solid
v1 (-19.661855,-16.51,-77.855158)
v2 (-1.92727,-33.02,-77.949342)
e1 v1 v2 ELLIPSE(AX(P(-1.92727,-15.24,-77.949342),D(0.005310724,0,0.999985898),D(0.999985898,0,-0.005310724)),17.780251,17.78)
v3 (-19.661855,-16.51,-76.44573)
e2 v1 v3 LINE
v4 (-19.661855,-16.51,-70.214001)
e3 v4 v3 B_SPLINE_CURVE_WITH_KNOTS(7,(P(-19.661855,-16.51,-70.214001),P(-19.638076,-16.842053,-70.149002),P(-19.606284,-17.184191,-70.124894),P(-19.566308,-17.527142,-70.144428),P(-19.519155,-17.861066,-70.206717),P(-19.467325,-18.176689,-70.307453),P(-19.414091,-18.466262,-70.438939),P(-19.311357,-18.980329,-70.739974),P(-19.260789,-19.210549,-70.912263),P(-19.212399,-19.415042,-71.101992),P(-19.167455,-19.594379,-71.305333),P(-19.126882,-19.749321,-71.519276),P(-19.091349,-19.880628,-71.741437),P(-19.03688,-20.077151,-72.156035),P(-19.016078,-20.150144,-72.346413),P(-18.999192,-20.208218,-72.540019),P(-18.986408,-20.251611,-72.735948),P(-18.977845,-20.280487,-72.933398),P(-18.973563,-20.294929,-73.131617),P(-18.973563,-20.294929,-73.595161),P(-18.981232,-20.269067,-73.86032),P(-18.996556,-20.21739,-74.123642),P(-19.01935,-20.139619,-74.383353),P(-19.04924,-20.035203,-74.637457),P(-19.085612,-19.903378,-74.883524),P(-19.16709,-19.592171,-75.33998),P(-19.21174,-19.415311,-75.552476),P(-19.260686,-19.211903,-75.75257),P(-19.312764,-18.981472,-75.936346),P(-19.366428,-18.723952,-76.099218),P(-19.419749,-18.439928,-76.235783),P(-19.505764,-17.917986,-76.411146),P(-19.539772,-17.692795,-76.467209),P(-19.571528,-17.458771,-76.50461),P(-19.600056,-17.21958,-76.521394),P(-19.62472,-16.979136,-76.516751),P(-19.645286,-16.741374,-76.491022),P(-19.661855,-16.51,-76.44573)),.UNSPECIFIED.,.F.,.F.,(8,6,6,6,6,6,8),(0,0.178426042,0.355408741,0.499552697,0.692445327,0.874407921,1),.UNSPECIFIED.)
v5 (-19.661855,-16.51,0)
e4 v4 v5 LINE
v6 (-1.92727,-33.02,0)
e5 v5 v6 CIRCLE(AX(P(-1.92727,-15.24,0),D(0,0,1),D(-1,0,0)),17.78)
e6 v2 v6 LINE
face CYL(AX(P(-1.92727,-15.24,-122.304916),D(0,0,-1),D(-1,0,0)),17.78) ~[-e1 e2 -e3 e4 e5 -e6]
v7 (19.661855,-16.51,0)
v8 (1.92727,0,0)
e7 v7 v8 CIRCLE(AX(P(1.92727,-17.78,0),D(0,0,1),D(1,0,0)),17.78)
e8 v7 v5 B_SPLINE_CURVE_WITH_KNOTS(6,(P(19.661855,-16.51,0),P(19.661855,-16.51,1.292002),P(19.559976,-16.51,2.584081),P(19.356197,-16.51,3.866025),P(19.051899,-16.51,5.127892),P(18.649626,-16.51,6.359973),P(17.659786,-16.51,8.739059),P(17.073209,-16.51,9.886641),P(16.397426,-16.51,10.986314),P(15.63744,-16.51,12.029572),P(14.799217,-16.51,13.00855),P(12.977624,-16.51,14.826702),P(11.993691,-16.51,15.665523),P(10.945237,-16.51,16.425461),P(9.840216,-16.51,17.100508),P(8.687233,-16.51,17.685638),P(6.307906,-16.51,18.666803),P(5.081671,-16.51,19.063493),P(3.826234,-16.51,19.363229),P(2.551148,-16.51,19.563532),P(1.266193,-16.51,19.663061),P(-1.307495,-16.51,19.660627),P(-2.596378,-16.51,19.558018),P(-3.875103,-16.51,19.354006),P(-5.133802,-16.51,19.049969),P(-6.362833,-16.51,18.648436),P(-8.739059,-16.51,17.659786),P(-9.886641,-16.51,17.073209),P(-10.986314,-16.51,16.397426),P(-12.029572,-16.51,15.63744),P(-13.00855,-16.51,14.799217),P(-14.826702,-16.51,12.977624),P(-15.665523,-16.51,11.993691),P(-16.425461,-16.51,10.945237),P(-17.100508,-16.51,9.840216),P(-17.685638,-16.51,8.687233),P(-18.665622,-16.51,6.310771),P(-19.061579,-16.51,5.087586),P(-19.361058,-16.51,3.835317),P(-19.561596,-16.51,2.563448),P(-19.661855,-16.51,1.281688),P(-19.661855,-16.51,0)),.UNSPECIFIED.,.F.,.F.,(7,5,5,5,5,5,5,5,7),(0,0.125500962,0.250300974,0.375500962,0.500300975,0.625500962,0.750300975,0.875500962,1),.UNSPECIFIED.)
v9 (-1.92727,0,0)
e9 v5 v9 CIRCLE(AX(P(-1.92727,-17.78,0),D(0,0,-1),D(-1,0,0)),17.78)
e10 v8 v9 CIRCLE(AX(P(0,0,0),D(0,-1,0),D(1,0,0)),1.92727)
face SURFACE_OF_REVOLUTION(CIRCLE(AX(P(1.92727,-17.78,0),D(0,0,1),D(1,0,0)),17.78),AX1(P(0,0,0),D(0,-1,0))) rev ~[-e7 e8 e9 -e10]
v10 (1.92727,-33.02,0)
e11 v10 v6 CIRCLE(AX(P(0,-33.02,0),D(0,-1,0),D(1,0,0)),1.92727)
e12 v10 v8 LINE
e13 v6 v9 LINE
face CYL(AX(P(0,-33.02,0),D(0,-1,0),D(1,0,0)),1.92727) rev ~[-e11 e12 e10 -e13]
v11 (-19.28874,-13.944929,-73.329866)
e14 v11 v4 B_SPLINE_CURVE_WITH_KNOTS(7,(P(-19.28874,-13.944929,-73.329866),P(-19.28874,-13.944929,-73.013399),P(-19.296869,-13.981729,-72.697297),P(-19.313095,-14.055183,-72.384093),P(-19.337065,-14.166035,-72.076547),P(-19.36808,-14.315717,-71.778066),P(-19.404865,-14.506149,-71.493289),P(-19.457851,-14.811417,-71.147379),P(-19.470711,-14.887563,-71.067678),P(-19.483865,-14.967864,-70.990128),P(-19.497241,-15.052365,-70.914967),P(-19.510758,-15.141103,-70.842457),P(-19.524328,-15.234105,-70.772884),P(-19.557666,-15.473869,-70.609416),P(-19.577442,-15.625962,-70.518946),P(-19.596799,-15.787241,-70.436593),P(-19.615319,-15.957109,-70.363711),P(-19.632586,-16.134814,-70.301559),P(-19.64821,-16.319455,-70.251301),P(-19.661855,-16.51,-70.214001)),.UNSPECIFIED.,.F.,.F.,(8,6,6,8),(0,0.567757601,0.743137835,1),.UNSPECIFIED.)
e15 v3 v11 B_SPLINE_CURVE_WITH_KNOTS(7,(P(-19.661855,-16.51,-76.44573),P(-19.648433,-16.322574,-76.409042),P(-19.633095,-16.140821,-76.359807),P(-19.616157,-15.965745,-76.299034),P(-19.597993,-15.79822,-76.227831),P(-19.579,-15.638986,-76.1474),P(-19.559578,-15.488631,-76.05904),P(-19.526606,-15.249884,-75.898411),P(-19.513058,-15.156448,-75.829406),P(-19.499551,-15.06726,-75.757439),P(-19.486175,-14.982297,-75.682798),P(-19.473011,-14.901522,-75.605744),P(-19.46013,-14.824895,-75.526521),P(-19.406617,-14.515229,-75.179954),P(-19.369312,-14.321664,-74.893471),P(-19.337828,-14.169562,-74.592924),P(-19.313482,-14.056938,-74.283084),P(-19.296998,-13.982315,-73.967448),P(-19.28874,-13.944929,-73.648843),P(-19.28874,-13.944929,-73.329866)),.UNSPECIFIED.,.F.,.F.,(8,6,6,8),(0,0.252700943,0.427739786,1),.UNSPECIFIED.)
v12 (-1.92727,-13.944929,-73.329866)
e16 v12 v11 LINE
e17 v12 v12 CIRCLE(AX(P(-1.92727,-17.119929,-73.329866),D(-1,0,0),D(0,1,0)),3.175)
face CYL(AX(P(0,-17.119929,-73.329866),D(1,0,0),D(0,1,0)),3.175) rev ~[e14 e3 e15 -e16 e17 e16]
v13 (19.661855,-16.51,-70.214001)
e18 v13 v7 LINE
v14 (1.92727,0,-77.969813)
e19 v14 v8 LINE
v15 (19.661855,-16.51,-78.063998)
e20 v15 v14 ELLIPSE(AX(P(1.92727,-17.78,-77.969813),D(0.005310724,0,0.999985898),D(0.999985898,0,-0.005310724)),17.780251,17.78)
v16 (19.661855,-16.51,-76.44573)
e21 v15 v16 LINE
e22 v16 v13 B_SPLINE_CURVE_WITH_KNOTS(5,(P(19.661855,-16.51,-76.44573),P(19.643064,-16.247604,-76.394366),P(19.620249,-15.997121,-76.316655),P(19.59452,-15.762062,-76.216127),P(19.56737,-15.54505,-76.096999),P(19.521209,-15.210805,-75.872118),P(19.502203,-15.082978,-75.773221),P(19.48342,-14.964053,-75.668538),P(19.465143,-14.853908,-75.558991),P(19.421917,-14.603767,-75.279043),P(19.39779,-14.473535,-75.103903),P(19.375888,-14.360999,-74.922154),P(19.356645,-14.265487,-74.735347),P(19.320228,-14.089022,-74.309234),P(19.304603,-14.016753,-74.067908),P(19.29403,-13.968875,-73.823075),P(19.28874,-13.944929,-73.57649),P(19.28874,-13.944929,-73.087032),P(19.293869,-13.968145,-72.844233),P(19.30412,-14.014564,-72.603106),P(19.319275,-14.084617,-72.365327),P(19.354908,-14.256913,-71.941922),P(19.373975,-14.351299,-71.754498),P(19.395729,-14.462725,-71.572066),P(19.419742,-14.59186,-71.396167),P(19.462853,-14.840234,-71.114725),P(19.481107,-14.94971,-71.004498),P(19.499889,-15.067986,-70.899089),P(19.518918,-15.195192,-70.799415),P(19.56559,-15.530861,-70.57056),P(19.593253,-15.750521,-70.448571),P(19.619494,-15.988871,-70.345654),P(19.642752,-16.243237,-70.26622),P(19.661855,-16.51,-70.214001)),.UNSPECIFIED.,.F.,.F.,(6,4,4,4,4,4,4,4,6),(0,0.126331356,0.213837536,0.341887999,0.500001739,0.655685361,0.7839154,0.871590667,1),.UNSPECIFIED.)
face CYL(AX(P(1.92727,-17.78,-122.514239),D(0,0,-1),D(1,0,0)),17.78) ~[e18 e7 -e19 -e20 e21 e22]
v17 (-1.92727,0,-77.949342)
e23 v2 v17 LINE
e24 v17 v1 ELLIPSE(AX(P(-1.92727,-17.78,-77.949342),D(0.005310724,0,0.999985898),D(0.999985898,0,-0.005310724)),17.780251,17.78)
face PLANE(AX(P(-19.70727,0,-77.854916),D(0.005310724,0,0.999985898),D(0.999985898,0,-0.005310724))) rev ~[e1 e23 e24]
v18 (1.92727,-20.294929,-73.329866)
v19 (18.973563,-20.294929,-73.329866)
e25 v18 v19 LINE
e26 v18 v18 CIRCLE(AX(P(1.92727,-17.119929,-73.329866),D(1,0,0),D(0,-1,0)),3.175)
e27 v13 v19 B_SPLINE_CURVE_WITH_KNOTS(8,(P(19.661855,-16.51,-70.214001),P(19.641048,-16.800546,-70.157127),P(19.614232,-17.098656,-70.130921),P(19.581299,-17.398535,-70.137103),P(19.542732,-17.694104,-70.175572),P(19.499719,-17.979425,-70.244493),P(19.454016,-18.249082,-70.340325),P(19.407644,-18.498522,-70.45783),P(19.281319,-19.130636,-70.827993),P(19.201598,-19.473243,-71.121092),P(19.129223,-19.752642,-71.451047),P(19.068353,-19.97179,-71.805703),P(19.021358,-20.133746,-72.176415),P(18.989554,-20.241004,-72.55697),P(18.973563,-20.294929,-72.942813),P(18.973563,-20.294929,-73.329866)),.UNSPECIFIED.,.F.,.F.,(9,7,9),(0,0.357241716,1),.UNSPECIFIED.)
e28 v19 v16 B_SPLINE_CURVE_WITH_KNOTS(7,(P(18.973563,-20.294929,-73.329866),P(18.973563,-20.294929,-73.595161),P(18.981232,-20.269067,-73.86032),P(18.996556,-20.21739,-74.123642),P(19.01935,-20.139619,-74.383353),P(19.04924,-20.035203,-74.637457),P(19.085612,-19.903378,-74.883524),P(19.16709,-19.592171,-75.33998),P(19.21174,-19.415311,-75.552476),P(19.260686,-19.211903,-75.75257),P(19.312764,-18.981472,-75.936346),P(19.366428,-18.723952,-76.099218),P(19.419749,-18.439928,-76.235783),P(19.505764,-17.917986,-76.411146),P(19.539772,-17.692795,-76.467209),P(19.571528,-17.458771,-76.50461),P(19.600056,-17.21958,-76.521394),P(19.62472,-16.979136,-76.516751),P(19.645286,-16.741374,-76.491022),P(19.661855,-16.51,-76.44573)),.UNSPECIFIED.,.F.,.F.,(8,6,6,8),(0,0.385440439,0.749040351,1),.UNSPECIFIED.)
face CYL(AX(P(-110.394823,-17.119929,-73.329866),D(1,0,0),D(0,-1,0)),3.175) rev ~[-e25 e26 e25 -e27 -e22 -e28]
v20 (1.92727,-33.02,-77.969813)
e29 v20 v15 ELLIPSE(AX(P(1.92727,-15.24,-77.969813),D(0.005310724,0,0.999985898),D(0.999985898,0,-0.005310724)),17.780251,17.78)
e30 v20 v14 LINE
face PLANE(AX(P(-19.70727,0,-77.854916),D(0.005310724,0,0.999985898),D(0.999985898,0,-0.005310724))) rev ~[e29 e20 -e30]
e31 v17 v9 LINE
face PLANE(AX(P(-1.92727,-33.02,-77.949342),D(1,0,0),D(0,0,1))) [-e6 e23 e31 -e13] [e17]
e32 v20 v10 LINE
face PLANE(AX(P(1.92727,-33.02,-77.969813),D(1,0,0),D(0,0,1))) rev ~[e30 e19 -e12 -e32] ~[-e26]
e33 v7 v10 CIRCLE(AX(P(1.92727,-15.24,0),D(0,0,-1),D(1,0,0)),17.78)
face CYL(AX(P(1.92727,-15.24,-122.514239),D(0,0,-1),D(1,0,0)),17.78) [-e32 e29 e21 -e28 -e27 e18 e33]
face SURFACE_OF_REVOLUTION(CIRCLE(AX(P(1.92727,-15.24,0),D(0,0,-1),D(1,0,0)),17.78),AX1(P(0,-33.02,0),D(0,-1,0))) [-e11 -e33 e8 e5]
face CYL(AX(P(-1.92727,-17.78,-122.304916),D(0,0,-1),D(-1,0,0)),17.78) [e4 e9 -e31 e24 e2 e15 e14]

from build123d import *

# Parameters (mm, degrees)
F1_DEPTH    = 33.02
F2_T1_DEPTH = 122.514239143
F2_T3_DEPTH = 122.3049164534
F2_T6_ANGLE = 180
F2_T8_ANGLE = 180
F3_DEPTH    = 127
F5_D        = 6.35
F5_DEPTH    = 19.6628549222
F6_D        = 6.35


# Not quite as in the source:
# - a fillet or chamfer that OpenCascade refuses, or shapes differently, is made with other operations: its cross-section is extruded or revolved along the edge and cut away or added


with BuildPart() as f1:
    # F0 (on Front) → F1 (new body)
    with BuildSketch(Plane.XZ):
        with BuildLine():
            Line((-19.7072699666, 0), (19.7072699666, 0))
            ThreePointArc((19.7072699666, 0), (0, 19.7072699666), (-19.7072699666, 0))
        make_face()
        Polygon((19.7072699666, -78.064239143), (19.7072699666, 0), (-19.7072699666, 0), (-19.7072699666, -77.8549164534), align=None)
    extrude(amount=F1_DEPTH)

    # F2: fillet of radius 17.78 on 2 edges, made by hand

    # F2_s2 → F2_t1 (cut)
    with BuildSketch(Plane.XY.offset(-122.514239143)):
        with BuildLine():
            ThreePointArc((19.7072699666, -17.78), (14.4996285361, -5.2076414305), (1.9272699666, 0))
            Line((1.9272699666, 0), (19.7072699666, 0))
            Line((19.7072699666, 0), (19.7072699666, -17.78))
        make_face()
        with BuildLine():
            ThreePointArc((19.7072699666, -15.24), (14.4996285361, -27.8123585695), (1.9272699666, -33.02))
            Line((1.9272699666, -33.02), (19.7072699666, -33.02))
            Line((19.7072699666, -33.02), (19.7072699666, -15.24))
        make_face()
    extrude(amount=F2_T1_DEPTH, mode=Mode.SUBTRACT)

    # F2_s4 → F2_t3 (cut)
    with BuildSketch(Plane.XY.offset(-122.3049164534)):
        with BuildLine():
            ThreePointArc((-19.7072699666, -15.24), (-14.4996285361, -27.8123585695), (-1.9272699666, -33.02))
            Line((-1.9272699666, -33.02), (-19.7072699666, -33.02))
            Line((-19.7072699666, -33.02), (-19.7072699666, -15.24))
        make_face()
        with BuildLine():
            ThreePointArc((-19.7072699666, -17.78), (-14.4996285361, -5.2076414305), (-1.9272699666, 0))
            Line((-1.9272699666, 0), (-19.7072699666, 0))
            Line((-19.7072699666, 0), (-19.7072699666, -17.78))
        make_face()
    extrude(amount=F2_T3_DEPTH, mode=Mode.SUBTRACT)

    # F2_s5 → F2_t6 (revolve, cut)
    with BuildSketch(Plane.XY):
        with BuildLine():
            ThreePointArc((19.7072699666, -15.24), (14.4996285361, -27.8123585695), (1.9272699666, -33.02))
            Line((1.9272699666, -33.02), (19.7072699666, -33.02))
            Line((19.7072699666, -33.02), (19.7072699666, -15.24))
        make_face()
    revolve(axis=Axis((0, -33.02, 0), (0, -1, 0)), revolution_arc=F2_T6_ANGLE, mode=Mode.SUBTRACT)

    # F2_s7 → F2_t8 (revolve, cut)
    with BuildSketch(Plane.XY):
        with BuildLine():
            ThreePointArc((19.7072699666, -17.78), (14.4996285361, -5.2076414305), (1.9272699666, 0))
            Line((1.9272699666, 0), (19.7072699666, 0))
            Line((19.7072699666, 0), (19.7072699666, -17.78))
        make_face()
    revolve(axis=Axis((0, 0, 0), (0, -1, 0)), revolution_arc=F2_T8_ANGLE, mode=Mode.SUBTRACT)

    # F3 (cut): a face of the model
    f3_faces = [f1.faces().sort_by_distance(p)[0] for p in [
        (8.27376e-05, -33.02, -38.2217878295),
    ]]
    extrude(f3_faces, amount=-F3_DEPTH, mode=Mode.SUBTRACT)

    # F5 (through all, one way)
    with BuildSketch(Plane.YZ):
        with Locations((-17.1199291945, -73.3298659325)):
            Circle(F5_D / 2)
    extrude(amount=-F5_DEPTH, mode=Mode.SUBTRACT)

    # F6 (through all)
    with Locations(Plane(origin=(0, 0, 0), x_dir=(0, 1, 0), z_dir=(-1, 0, 0))):
        with Locations((-17.1199291945, 73.3298659325)):
            Hole(F6_D / 2)


solid = f1.part
